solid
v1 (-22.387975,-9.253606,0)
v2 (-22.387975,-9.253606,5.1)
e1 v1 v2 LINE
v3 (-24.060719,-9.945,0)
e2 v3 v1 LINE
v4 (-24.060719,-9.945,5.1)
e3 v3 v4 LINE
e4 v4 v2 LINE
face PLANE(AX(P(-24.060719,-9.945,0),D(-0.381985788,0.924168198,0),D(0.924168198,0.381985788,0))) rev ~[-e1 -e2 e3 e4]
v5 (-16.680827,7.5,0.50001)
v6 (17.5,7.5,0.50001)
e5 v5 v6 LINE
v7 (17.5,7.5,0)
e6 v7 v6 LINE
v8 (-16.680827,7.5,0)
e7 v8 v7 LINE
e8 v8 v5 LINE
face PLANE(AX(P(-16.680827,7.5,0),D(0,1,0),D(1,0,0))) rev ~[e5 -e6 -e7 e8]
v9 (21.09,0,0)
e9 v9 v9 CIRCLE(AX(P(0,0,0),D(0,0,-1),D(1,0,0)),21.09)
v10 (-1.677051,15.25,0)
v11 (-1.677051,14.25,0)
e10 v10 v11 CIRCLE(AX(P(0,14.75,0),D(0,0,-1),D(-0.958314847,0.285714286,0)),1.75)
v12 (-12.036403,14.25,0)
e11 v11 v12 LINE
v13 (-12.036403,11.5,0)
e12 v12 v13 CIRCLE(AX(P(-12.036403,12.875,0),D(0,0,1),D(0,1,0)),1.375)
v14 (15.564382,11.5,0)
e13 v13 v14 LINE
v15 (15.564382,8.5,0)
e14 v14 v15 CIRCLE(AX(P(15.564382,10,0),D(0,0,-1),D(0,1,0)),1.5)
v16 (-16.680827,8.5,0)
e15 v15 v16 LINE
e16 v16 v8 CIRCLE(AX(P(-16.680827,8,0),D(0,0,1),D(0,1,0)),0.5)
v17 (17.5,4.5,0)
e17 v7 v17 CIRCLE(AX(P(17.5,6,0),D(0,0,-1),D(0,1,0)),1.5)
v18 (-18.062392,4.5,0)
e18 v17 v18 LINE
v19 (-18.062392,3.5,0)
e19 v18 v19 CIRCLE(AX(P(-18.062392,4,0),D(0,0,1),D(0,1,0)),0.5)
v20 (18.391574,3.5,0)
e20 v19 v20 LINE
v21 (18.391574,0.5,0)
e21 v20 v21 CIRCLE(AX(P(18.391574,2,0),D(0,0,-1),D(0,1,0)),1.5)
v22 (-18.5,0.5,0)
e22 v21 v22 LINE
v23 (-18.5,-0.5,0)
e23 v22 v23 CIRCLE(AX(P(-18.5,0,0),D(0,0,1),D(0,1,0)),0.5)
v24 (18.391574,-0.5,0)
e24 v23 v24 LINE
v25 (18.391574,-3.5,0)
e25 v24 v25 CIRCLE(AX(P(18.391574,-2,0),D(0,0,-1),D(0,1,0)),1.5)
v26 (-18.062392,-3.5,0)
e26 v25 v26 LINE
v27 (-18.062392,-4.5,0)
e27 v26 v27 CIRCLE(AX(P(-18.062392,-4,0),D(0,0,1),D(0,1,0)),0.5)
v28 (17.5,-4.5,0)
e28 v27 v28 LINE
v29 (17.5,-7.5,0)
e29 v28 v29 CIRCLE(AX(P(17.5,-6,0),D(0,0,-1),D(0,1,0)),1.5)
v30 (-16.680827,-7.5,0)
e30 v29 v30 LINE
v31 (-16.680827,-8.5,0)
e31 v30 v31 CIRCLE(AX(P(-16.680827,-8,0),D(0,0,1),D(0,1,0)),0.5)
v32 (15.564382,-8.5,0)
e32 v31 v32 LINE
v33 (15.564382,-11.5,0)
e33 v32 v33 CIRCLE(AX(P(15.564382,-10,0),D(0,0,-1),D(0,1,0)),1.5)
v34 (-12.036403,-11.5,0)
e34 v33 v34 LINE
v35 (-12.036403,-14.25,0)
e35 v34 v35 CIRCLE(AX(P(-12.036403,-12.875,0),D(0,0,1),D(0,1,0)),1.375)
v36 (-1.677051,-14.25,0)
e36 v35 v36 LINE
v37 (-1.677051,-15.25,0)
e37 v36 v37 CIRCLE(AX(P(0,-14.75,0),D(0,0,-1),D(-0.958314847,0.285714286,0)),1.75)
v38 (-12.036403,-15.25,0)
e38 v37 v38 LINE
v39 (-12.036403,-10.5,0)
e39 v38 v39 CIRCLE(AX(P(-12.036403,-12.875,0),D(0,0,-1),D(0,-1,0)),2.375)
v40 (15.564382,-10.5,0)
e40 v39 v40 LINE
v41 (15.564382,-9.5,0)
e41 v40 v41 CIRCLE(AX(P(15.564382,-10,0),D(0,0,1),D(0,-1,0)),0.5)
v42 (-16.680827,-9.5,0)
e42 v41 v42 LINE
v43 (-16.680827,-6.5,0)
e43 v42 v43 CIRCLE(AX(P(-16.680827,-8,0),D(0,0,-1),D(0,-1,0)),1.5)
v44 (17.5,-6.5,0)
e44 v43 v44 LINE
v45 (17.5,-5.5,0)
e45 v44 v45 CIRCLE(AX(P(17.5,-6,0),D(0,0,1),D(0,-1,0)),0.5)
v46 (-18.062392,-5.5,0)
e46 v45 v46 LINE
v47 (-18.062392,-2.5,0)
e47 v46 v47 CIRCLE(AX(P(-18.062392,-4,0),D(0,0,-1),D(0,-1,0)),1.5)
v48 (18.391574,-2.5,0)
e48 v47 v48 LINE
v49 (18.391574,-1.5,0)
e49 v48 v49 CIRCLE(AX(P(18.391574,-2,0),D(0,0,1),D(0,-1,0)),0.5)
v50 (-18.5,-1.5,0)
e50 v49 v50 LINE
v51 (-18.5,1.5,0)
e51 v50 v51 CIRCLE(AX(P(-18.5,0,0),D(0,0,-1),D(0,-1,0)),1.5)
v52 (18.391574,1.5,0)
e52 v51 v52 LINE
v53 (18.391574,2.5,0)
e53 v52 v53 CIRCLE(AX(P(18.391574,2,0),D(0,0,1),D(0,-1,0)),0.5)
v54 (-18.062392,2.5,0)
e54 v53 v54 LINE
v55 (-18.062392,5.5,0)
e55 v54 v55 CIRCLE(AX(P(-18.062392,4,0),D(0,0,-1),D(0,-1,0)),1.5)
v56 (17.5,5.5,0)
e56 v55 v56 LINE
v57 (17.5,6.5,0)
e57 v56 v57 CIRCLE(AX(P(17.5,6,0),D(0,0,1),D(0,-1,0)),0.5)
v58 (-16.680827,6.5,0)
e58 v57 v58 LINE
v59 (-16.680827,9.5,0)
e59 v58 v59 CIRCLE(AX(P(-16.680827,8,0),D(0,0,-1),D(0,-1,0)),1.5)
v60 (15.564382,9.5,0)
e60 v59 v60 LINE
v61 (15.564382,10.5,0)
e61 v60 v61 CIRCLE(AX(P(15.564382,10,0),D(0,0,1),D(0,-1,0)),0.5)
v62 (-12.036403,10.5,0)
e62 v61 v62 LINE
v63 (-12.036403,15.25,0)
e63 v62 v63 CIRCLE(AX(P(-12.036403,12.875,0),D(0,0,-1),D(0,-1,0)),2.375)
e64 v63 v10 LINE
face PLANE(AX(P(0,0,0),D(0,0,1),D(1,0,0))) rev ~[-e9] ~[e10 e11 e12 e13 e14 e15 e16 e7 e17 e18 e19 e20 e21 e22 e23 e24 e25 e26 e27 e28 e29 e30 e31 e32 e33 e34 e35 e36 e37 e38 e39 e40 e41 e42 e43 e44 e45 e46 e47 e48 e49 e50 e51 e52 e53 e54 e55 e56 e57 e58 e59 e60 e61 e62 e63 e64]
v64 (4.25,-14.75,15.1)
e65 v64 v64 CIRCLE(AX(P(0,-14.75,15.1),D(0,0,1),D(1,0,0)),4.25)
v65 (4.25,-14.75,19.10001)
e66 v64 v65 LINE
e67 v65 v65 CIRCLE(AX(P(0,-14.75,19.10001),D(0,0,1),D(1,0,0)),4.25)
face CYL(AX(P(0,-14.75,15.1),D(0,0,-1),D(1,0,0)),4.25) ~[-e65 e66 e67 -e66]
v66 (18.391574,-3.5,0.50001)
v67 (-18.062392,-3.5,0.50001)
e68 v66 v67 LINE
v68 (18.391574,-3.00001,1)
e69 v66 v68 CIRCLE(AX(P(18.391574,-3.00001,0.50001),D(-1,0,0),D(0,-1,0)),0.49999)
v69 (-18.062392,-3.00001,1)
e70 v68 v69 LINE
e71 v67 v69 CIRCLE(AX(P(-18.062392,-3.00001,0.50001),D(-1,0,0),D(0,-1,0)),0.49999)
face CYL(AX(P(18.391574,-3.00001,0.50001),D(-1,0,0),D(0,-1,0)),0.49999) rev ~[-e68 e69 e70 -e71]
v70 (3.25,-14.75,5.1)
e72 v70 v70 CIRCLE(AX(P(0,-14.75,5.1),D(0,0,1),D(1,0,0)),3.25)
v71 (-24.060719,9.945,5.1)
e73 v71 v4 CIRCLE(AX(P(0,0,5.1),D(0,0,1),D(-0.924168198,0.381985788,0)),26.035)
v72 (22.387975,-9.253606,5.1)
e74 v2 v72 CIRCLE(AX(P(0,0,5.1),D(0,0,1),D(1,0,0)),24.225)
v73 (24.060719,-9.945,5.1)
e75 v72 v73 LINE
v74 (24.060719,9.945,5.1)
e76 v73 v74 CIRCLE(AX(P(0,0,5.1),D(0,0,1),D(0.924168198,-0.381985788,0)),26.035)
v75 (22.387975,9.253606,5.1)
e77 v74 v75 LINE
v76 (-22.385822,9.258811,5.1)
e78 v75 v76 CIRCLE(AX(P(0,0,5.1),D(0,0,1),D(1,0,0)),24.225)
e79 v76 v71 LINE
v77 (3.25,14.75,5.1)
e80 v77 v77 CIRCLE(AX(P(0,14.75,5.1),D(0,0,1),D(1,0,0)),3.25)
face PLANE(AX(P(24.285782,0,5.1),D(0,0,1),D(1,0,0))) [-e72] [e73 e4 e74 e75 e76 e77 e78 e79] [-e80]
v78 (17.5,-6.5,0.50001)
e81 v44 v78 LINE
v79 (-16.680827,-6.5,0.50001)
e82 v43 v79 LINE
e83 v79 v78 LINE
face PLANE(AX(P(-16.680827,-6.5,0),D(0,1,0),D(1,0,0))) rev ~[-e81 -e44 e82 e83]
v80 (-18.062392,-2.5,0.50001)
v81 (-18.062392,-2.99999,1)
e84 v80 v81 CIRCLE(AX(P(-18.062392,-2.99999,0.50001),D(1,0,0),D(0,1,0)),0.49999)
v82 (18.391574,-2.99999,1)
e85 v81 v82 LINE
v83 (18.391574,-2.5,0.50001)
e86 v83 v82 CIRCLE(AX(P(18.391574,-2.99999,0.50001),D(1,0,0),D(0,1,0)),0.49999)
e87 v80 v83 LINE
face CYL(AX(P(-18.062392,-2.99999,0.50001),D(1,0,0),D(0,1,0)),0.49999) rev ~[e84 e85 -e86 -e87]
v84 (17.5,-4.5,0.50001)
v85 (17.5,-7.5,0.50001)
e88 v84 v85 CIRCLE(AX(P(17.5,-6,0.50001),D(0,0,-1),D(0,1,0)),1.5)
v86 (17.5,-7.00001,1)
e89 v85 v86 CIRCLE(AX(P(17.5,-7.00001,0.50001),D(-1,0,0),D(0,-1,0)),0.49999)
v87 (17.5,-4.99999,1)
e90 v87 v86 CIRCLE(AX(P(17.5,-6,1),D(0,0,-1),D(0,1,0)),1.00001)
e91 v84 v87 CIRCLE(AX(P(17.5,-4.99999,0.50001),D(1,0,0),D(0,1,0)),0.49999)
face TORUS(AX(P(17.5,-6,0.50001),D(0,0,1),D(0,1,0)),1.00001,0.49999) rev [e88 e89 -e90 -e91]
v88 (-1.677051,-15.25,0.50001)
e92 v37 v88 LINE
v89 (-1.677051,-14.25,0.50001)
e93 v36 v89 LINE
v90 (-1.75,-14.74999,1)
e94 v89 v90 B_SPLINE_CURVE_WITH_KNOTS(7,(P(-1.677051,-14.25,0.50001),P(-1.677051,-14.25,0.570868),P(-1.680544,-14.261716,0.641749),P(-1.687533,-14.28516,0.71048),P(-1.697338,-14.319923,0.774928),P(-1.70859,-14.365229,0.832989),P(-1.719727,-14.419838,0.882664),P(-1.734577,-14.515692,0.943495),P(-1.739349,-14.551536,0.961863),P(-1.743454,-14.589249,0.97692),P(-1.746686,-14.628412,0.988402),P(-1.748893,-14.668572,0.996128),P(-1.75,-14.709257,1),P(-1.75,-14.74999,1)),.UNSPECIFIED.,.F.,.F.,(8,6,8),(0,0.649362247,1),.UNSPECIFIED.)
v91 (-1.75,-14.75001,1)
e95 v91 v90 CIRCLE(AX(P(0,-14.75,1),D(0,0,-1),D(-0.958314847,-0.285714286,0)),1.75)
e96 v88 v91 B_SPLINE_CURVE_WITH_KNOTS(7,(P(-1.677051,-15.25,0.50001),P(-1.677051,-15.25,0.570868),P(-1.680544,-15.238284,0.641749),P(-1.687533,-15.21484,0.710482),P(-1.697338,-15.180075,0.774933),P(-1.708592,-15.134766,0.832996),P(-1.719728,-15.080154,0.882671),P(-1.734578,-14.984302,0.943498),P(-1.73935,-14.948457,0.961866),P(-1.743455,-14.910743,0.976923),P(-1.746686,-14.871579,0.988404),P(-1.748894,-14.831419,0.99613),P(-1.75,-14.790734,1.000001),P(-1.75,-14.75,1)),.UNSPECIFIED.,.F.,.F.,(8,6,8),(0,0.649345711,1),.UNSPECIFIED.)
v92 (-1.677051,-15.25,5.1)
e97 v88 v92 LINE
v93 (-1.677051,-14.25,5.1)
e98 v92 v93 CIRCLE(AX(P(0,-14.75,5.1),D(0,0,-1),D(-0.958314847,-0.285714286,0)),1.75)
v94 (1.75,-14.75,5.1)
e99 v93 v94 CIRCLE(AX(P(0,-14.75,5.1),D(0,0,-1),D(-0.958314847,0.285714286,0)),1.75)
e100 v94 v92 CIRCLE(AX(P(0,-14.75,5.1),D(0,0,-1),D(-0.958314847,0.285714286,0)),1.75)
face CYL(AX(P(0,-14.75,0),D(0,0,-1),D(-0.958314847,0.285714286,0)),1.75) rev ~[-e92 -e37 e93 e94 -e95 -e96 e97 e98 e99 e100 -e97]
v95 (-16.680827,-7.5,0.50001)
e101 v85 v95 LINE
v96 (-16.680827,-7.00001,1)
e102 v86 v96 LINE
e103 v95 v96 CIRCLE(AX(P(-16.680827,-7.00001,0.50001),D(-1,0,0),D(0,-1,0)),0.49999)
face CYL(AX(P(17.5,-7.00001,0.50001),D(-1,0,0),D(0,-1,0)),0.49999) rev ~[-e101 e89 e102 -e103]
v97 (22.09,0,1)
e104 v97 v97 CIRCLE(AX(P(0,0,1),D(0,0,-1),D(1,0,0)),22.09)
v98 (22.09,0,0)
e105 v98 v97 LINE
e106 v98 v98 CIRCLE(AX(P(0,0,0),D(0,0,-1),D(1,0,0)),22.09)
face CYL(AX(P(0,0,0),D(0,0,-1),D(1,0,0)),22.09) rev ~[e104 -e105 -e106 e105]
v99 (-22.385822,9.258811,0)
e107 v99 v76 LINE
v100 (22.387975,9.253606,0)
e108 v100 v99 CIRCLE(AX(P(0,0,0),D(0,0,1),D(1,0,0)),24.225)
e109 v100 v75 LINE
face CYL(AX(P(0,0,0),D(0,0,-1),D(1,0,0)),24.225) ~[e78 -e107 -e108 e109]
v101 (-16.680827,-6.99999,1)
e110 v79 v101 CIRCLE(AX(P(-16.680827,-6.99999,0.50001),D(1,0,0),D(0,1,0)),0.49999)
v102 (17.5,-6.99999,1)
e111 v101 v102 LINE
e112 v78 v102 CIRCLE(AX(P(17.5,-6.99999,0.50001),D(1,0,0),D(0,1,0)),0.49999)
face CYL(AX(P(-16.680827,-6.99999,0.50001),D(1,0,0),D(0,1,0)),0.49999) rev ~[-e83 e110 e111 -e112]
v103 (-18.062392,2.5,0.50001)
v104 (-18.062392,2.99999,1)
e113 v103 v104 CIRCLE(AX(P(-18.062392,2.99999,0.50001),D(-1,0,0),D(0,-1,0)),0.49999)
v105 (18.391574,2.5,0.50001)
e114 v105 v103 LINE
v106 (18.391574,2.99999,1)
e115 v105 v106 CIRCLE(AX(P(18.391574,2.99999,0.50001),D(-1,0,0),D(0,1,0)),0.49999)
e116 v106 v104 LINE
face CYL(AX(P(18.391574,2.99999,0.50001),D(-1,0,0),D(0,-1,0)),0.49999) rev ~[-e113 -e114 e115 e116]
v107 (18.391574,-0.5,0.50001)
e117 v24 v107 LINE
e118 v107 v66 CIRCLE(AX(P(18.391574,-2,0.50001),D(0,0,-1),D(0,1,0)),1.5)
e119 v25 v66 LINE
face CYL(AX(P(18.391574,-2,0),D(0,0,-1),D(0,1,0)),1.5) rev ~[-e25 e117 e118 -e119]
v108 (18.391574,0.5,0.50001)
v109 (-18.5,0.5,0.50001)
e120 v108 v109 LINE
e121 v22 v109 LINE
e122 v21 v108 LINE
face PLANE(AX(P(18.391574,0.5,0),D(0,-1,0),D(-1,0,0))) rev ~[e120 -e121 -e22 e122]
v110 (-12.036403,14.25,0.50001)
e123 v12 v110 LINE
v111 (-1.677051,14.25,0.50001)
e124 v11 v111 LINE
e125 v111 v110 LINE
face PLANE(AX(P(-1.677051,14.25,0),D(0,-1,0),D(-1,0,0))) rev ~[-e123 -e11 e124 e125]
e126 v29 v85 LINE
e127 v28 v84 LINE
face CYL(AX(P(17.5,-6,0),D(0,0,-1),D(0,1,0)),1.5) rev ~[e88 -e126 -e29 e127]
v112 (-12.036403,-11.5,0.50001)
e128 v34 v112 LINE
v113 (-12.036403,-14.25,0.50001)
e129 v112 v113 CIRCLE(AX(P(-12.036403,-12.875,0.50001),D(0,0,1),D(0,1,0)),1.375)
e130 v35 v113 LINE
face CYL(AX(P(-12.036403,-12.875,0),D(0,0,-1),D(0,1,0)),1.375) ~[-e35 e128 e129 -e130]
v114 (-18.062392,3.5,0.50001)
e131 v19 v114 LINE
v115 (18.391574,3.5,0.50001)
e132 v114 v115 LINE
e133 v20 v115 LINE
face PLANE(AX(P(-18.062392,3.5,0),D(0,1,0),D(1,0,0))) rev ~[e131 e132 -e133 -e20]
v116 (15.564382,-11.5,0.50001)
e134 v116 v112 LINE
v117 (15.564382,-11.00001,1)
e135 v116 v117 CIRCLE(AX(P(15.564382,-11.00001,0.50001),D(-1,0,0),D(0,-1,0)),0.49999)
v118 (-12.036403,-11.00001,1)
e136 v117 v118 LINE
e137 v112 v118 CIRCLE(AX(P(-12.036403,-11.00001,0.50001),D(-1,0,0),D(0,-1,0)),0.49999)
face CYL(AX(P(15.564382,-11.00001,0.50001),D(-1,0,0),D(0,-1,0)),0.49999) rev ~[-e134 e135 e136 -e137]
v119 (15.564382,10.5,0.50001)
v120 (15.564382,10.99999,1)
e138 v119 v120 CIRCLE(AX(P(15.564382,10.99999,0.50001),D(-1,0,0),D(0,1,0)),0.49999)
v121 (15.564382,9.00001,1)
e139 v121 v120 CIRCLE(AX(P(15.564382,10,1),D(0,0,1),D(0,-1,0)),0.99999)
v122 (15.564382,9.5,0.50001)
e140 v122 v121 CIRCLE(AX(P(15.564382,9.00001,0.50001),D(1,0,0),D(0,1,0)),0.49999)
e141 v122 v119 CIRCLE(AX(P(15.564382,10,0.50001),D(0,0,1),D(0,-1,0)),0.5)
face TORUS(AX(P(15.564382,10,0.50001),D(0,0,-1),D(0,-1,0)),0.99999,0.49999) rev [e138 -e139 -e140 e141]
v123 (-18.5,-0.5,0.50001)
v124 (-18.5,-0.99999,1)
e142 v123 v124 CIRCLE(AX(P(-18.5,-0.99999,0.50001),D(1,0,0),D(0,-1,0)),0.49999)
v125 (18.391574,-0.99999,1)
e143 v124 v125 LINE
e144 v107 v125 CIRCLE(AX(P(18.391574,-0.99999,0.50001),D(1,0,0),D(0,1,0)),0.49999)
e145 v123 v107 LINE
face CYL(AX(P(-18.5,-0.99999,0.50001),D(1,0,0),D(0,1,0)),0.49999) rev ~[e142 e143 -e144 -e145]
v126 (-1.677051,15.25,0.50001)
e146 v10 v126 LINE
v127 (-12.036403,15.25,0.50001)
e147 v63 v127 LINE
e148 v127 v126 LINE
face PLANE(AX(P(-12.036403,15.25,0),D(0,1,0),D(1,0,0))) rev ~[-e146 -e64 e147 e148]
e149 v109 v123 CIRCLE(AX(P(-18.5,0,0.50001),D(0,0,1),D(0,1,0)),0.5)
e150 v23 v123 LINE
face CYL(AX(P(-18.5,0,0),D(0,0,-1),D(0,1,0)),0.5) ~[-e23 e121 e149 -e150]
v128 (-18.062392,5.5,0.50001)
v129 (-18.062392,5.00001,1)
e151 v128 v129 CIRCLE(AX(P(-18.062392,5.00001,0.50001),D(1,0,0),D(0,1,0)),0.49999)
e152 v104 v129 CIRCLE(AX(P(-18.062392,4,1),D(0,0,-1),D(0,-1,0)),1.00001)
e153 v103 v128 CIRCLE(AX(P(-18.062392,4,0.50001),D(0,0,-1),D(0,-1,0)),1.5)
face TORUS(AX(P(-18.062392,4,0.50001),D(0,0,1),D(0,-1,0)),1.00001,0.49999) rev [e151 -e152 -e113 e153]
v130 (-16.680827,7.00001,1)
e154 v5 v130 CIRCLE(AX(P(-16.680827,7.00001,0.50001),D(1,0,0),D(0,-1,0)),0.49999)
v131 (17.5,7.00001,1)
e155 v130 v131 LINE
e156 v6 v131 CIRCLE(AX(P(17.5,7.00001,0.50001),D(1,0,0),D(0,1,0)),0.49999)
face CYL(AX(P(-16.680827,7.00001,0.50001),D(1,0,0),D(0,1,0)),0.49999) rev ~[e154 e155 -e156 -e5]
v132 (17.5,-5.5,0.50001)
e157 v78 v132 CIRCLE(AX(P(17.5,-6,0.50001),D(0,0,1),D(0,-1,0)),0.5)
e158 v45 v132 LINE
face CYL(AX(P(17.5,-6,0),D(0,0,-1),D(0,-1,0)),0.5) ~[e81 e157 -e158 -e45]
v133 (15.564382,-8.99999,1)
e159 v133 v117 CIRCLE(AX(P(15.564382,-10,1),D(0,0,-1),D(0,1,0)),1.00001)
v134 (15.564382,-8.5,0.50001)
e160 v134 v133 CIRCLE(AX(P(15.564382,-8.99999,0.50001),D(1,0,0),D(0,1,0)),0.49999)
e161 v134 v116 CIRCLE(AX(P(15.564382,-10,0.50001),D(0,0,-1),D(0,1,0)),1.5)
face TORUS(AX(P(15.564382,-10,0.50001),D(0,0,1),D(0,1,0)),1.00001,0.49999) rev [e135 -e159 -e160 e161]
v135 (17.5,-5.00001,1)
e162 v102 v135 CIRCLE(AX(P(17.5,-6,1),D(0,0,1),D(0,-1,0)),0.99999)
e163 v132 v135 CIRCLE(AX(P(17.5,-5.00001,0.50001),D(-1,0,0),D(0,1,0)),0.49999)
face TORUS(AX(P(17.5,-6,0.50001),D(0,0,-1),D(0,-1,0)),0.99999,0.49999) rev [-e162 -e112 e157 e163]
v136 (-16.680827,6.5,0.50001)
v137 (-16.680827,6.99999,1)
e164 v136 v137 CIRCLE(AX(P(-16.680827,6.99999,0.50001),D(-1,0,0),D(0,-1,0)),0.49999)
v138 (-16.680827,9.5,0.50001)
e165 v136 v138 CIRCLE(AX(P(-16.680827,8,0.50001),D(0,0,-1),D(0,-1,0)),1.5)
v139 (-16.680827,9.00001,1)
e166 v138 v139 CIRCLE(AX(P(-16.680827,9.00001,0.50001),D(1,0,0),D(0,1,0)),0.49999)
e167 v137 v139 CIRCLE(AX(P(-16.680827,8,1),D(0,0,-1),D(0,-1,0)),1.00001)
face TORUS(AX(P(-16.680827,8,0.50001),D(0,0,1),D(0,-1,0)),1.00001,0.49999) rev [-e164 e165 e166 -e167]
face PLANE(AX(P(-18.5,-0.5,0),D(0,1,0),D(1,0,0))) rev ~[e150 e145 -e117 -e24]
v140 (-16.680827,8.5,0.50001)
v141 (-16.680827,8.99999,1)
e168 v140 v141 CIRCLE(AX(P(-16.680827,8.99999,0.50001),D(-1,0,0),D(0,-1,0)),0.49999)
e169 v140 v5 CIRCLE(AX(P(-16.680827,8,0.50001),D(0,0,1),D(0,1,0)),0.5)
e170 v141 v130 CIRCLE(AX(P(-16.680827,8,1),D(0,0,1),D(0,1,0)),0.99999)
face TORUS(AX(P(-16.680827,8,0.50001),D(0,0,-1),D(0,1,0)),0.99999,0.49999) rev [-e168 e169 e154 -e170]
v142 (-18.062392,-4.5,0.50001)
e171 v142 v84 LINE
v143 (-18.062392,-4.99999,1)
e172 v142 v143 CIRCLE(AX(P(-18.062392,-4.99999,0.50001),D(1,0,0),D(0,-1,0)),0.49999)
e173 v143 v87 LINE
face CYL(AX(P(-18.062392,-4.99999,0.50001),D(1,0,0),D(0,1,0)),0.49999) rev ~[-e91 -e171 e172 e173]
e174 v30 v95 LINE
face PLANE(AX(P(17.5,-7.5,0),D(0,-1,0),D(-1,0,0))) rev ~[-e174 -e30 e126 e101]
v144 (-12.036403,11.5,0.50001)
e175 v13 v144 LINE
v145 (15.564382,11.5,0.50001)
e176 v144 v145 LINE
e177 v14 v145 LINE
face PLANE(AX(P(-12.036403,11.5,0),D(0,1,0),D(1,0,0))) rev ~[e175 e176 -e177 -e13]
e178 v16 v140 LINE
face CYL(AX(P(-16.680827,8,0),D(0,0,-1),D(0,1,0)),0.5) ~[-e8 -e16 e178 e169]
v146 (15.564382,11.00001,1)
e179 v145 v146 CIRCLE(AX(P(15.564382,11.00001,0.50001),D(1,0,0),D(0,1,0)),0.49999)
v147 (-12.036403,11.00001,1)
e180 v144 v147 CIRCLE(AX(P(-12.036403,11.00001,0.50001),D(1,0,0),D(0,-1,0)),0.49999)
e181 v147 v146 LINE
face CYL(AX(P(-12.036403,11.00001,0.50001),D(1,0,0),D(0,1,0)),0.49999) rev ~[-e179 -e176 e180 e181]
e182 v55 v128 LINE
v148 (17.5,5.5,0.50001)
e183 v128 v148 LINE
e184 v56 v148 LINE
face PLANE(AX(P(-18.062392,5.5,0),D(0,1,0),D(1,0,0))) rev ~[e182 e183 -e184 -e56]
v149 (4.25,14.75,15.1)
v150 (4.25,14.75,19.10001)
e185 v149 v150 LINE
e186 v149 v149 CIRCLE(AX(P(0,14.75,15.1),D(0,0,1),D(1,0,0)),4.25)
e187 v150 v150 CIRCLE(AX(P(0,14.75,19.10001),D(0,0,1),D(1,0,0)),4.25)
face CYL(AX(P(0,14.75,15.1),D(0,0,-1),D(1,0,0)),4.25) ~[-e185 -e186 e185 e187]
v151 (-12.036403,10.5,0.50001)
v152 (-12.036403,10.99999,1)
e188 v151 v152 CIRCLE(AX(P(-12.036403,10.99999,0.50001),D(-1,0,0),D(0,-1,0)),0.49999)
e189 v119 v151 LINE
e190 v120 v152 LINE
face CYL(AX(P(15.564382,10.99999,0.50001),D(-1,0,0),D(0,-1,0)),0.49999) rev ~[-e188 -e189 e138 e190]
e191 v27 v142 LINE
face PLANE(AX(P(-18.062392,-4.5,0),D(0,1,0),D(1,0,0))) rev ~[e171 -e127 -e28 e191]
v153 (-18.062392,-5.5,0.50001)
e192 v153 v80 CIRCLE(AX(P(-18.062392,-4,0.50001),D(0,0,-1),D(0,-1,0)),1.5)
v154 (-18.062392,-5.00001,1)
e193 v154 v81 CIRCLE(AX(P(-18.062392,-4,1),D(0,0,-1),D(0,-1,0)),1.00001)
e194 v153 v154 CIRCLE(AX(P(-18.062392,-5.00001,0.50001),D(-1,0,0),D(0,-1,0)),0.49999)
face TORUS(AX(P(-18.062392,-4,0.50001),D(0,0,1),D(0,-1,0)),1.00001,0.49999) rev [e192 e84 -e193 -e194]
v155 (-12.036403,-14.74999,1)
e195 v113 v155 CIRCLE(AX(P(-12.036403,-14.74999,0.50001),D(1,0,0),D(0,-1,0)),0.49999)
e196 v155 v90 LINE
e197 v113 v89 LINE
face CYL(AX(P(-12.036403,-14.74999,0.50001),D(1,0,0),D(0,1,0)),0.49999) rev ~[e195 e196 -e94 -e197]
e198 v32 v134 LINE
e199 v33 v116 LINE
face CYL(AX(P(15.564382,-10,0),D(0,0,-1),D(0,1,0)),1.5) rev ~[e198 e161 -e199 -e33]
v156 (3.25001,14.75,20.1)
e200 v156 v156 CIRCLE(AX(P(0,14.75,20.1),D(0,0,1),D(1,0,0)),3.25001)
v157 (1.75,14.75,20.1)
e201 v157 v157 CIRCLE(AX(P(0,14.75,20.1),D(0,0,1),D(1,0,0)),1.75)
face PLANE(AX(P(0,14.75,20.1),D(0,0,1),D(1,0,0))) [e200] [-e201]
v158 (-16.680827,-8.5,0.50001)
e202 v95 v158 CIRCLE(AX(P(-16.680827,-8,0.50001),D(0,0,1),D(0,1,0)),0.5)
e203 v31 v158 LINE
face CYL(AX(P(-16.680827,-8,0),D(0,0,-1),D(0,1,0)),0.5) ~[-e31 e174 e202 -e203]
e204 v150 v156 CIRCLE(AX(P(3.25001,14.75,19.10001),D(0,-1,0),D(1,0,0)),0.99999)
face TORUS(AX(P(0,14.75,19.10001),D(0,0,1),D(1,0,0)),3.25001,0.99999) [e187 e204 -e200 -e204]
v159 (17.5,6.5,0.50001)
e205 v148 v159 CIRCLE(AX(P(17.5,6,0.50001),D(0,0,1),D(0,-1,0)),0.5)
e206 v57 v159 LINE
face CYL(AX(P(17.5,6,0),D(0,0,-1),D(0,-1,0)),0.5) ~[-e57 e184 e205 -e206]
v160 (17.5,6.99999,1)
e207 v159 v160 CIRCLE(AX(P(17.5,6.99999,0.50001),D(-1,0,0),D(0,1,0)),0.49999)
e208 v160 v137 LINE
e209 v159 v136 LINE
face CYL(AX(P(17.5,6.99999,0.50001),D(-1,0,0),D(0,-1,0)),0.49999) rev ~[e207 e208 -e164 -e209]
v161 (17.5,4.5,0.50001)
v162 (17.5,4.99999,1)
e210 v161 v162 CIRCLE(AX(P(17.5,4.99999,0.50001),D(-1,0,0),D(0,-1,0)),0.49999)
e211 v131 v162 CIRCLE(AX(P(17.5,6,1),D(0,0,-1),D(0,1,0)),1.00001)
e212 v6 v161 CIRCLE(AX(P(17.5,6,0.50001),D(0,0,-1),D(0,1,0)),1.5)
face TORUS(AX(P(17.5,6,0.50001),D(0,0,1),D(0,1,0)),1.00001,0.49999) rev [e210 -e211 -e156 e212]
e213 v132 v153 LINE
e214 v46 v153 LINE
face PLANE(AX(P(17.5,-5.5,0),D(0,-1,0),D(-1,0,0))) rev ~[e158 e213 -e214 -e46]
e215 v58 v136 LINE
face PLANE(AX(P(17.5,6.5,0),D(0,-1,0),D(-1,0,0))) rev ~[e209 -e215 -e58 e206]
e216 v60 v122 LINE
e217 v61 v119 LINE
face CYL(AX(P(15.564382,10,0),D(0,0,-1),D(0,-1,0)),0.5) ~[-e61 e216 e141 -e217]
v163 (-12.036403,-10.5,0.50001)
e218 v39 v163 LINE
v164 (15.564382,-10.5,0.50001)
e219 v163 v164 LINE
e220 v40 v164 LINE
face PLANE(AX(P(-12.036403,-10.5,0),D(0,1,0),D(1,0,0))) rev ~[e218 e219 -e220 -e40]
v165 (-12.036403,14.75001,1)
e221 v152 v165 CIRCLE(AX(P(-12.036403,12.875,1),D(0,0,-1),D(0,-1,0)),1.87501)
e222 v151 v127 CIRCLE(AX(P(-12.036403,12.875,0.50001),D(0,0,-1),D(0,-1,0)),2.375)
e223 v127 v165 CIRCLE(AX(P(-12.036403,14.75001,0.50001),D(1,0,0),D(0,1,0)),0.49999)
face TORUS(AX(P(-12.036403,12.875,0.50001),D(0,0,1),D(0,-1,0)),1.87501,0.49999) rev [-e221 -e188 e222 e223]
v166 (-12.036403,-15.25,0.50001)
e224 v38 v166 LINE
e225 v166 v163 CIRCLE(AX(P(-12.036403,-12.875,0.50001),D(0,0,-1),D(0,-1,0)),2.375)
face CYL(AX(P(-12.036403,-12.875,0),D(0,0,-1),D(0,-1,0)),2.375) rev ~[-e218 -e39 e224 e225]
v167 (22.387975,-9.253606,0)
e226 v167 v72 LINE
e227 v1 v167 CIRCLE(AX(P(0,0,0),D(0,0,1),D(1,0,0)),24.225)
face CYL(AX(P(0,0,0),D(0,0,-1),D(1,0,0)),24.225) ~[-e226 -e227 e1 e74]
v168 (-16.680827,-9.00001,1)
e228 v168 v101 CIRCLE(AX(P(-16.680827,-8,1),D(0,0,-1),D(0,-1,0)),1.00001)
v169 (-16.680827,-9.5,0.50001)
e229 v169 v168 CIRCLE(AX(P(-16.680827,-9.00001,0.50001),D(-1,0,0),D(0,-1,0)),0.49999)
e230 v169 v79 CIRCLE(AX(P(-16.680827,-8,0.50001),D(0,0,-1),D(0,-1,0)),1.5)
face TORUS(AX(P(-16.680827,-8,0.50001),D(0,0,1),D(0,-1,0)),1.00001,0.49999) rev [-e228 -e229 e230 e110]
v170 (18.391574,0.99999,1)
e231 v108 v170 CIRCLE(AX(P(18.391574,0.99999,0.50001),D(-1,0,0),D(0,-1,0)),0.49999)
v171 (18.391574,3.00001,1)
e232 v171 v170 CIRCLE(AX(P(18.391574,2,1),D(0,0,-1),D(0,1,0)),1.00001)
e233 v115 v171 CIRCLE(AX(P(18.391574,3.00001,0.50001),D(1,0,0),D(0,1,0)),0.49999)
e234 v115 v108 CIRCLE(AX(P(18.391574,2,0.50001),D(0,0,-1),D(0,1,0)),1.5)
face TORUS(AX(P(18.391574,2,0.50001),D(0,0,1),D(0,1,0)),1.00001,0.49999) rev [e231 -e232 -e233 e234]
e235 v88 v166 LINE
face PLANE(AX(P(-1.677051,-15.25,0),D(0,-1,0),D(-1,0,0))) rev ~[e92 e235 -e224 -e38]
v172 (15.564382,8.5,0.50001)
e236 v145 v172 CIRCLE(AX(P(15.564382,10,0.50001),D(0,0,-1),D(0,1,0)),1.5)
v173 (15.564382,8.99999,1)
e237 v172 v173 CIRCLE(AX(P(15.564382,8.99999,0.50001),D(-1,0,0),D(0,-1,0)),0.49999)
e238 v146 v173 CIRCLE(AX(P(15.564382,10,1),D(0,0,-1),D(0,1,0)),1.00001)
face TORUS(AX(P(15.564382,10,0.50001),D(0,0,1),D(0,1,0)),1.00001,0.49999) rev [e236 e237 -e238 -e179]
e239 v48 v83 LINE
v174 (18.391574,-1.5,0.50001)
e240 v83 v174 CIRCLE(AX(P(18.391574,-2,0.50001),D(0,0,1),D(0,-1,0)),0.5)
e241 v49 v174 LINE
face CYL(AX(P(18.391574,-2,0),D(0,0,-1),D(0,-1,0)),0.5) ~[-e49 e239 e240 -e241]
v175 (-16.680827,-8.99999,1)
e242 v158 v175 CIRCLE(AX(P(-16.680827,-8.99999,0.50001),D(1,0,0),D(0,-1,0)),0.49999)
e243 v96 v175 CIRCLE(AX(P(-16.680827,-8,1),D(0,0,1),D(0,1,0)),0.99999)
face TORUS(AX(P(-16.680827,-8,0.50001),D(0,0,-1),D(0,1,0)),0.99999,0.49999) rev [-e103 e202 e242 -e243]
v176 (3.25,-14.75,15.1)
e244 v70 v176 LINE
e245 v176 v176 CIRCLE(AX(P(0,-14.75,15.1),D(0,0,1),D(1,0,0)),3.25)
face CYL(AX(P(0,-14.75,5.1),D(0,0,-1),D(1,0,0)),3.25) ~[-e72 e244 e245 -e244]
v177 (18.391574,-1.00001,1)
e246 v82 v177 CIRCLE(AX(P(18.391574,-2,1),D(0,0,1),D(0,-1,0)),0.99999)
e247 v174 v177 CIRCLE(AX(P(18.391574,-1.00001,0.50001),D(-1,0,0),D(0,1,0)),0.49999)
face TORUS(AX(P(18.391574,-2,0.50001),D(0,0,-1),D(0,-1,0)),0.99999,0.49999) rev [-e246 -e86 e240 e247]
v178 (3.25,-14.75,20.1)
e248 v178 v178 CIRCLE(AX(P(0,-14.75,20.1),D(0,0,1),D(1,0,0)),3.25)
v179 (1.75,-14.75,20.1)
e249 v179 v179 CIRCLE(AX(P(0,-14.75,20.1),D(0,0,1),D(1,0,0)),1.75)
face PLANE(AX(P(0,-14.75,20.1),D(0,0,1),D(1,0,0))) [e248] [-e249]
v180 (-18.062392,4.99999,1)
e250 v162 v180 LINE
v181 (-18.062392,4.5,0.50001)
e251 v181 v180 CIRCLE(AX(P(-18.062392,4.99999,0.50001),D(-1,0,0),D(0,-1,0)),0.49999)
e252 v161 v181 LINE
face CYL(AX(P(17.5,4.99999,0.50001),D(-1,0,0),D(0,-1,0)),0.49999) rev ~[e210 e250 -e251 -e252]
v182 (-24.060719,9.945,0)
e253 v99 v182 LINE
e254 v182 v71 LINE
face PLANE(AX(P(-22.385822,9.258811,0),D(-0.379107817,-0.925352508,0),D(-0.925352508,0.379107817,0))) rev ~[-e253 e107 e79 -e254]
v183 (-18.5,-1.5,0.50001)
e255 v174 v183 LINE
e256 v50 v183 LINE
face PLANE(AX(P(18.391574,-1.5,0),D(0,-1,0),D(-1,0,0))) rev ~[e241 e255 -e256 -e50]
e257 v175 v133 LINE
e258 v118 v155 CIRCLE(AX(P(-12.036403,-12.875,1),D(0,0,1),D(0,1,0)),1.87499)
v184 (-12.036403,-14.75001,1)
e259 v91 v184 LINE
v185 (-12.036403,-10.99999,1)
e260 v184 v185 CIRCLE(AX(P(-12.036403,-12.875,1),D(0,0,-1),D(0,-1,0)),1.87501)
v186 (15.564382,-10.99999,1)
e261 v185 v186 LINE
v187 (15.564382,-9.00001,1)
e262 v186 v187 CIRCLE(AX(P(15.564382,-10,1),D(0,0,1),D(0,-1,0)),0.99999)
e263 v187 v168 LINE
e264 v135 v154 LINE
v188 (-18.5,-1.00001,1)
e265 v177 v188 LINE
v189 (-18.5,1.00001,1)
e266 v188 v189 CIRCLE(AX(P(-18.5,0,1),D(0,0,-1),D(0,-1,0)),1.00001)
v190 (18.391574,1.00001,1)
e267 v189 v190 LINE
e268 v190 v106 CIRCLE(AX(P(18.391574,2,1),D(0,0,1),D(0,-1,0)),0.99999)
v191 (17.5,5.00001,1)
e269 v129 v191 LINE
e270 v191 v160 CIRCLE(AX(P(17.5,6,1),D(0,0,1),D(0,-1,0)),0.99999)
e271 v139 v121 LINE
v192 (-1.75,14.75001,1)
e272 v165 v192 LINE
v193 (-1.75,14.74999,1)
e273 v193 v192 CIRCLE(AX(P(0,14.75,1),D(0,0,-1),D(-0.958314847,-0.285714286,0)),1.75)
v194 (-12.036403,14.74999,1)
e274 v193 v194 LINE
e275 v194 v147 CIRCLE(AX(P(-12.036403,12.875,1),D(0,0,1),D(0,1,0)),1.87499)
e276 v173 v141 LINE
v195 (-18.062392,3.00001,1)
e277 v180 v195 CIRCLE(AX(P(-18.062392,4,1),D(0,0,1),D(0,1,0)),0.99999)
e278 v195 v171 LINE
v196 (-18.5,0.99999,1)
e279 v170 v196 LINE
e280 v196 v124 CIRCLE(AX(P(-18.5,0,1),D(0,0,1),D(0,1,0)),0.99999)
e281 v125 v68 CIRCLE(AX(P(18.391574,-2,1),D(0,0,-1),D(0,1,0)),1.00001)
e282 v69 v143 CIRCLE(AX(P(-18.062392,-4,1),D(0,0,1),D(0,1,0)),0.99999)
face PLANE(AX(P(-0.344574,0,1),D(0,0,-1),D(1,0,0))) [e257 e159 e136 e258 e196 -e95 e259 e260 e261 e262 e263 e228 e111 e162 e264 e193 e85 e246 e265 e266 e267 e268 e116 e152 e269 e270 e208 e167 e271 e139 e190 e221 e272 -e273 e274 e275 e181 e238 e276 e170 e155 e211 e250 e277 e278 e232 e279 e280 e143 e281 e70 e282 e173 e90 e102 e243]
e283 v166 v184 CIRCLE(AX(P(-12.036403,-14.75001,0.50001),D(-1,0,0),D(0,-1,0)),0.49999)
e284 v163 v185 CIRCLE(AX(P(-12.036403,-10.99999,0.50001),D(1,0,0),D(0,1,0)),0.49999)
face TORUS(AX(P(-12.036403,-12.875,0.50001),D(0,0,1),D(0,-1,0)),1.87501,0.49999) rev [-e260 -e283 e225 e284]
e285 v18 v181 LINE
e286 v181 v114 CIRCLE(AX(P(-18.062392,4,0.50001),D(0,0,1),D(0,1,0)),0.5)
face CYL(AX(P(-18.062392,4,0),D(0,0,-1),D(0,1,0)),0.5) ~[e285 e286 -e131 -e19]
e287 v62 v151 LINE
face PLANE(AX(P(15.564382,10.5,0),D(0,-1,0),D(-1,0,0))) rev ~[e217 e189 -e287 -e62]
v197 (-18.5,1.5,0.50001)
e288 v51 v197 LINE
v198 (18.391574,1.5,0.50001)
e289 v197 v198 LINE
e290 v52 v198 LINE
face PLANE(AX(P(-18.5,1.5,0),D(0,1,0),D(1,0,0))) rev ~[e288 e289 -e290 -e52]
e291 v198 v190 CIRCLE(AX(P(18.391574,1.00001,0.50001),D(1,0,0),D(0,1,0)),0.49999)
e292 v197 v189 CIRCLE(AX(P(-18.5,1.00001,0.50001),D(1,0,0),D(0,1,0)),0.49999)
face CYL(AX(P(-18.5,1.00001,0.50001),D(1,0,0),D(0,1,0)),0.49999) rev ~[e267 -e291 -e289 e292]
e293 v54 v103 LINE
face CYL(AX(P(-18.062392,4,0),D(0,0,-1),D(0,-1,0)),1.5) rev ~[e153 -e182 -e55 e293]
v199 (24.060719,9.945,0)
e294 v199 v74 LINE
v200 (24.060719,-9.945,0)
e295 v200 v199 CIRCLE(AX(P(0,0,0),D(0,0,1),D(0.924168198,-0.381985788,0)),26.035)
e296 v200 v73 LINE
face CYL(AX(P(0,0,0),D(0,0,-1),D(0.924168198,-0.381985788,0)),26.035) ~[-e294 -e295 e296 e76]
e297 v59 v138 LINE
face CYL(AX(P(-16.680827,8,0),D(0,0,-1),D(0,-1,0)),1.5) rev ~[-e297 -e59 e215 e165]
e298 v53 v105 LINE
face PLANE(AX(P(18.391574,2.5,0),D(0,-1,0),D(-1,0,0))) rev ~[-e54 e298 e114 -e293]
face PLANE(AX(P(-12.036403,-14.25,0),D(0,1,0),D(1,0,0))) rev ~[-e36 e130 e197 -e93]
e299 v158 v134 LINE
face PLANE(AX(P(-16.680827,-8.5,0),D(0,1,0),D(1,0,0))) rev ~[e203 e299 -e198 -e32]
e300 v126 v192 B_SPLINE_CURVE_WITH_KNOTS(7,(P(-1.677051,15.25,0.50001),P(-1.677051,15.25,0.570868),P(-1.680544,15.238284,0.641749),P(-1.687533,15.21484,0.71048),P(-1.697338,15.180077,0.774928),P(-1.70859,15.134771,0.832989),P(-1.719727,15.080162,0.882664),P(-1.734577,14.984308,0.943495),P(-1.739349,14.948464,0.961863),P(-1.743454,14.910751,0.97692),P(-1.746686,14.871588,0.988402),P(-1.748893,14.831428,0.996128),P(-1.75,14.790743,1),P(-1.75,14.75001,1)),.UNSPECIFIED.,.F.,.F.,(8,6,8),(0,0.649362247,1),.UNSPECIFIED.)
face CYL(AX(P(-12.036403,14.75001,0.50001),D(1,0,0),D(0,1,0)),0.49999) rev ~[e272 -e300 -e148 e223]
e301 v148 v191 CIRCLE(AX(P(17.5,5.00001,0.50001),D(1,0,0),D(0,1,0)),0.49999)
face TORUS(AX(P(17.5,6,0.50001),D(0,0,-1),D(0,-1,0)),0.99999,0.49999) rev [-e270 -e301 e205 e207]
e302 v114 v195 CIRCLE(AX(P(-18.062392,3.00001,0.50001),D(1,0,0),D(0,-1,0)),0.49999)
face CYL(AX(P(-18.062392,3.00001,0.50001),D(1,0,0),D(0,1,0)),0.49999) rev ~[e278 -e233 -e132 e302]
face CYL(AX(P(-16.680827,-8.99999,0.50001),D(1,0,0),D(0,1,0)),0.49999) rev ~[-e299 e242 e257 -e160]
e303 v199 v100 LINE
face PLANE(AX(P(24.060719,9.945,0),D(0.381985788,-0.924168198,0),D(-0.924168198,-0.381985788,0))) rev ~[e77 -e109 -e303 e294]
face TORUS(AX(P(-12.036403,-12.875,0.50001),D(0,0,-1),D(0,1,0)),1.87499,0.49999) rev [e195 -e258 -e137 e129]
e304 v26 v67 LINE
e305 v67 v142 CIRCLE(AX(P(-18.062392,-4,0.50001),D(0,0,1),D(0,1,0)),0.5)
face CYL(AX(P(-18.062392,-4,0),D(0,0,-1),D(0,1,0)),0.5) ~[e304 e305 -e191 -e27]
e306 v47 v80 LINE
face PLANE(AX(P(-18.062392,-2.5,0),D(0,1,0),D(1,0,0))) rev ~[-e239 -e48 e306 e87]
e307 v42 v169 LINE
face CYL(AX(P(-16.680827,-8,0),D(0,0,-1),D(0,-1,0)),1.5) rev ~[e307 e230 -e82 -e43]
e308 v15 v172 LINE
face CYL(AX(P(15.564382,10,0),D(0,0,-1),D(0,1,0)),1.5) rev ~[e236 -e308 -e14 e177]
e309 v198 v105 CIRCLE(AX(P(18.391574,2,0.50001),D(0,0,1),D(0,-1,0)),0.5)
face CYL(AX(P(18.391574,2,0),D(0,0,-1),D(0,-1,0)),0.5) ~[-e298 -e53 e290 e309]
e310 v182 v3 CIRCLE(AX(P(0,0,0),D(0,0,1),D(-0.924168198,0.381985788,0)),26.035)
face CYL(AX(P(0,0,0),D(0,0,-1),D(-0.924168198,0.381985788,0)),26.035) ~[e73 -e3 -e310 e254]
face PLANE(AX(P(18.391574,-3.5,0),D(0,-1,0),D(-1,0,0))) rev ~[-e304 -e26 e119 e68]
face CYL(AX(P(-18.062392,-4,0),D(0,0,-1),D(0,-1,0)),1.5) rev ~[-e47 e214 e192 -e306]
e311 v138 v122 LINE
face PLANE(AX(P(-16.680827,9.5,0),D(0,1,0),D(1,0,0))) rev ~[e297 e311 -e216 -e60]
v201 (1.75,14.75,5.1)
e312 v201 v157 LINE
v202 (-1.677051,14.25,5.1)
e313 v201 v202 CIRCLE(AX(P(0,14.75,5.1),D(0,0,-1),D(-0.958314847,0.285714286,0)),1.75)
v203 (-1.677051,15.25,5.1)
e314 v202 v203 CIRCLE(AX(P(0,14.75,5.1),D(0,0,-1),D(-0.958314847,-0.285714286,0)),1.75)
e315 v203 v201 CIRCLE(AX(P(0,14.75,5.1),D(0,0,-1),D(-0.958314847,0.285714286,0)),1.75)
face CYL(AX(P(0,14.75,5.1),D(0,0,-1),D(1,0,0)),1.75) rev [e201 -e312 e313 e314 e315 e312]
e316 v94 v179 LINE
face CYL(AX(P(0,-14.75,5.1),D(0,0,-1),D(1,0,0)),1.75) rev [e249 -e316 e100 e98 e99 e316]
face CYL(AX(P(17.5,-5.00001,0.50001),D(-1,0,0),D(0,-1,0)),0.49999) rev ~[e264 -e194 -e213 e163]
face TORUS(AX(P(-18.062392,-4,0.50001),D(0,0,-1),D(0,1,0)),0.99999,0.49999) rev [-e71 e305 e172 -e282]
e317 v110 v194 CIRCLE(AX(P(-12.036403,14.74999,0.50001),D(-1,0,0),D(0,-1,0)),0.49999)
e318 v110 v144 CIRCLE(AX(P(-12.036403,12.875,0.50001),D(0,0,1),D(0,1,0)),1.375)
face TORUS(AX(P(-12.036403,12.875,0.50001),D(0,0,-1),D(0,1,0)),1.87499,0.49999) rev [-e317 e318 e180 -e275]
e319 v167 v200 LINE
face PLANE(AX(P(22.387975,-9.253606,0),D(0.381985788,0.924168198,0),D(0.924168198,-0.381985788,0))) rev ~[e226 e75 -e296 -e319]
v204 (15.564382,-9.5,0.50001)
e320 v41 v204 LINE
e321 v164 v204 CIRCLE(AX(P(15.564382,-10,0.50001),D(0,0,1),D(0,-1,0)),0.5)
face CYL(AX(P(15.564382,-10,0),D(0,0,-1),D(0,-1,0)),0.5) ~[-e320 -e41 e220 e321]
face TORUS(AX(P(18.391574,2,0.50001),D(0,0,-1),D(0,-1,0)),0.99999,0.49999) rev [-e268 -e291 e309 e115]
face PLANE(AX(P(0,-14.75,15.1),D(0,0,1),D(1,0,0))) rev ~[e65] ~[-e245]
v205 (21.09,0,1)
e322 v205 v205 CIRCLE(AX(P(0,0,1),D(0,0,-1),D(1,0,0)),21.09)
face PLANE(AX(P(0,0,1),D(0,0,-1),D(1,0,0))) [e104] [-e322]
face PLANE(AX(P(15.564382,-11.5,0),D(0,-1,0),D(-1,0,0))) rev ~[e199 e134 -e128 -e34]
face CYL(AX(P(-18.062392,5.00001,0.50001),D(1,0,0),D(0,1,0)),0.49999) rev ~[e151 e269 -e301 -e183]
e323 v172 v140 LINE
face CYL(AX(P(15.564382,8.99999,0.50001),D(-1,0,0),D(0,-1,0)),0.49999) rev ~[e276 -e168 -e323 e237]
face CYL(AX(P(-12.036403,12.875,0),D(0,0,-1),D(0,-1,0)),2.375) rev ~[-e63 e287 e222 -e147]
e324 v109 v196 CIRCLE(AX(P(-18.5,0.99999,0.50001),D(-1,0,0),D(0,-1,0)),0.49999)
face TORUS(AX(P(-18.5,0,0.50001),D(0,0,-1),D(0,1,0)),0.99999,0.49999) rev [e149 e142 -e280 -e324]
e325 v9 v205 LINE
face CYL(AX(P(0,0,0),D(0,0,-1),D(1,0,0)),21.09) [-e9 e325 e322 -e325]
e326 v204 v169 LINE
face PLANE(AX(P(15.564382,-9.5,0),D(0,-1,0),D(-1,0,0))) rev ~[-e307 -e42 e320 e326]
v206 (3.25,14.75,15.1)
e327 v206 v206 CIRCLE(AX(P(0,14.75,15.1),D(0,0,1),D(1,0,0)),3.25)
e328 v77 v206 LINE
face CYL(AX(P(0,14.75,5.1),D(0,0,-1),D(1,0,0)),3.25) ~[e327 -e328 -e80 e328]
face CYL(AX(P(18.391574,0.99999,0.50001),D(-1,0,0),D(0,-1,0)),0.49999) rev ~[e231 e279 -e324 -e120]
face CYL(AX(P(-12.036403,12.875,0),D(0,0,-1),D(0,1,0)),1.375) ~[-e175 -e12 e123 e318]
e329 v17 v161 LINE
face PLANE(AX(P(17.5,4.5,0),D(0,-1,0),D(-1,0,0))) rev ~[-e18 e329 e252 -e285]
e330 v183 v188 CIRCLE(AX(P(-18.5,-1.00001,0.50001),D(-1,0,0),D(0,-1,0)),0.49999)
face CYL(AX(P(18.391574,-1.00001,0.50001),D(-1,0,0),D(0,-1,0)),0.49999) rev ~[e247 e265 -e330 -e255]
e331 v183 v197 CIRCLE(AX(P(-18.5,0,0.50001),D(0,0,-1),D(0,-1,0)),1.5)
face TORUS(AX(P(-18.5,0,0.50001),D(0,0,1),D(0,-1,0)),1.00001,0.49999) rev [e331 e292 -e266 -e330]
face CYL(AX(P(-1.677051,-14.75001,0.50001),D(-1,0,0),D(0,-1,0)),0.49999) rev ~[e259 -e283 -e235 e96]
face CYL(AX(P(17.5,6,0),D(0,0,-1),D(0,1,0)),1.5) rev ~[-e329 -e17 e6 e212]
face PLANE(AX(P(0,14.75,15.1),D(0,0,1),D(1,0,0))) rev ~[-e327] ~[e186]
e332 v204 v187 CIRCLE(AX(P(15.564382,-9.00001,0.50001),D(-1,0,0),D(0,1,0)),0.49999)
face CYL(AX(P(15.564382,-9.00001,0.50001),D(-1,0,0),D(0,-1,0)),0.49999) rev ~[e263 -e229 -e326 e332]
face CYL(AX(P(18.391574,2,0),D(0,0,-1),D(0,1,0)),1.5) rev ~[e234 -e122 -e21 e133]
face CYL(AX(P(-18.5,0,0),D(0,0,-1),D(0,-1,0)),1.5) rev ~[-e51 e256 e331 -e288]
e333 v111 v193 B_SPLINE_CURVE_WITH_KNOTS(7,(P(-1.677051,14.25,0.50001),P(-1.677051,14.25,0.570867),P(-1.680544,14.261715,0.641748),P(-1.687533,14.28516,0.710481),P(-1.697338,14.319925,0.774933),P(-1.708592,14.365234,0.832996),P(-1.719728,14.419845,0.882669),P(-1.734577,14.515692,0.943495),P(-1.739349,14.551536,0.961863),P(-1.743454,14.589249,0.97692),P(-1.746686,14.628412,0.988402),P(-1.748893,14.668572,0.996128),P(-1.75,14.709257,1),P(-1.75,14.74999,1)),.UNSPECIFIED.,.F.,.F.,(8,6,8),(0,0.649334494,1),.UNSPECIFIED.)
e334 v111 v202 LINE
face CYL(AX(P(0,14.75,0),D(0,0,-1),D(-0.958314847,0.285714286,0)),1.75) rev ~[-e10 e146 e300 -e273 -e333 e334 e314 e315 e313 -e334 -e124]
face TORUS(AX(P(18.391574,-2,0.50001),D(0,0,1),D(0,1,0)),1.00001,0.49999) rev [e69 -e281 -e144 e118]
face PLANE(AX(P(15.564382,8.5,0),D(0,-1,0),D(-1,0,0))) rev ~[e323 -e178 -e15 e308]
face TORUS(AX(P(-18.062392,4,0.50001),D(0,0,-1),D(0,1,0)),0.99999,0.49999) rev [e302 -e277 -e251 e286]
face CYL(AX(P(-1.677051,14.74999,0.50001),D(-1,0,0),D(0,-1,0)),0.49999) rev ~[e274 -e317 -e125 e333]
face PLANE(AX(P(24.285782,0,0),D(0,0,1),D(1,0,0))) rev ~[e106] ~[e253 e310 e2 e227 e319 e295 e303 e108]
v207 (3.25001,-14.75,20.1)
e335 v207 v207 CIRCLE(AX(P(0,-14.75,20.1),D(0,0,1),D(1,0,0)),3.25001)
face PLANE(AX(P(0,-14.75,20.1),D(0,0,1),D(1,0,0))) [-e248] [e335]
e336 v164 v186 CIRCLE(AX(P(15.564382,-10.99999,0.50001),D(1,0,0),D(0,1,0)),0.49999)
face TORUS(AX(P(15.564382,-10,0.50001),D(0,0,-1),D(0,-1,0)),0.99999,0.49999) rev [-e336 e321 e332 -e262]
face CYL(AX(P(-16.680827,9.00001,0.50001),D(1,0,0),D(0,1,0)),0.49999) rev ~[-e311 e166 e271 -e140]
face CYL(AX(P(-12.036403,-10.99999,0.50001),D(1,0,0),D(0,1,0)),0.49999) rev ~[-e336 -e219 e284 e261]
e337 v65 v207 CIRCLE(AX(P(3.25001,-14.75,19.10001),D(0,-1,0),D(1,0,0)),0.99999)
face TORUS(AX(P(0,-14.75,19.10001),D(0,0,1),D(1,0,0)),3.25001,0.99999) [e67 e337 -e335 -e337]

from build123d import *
from build123d import SkipClean  # not in build123d's __all__

# Parameters (mm, degrees)
F0_R      = 24.225
F1_DEPTH  = 5.1
F2_R      = 22.09
F2_R_2    = 21.09
F3_DEPTH  = 1
F5_DEPTH  = 1
F6_R      = 0.49999
F8_DEPTH  = 5.101
F9_R      = 3.25
F9_R_2    = 1.75
F10_DEPTH = 15
F12_DEPTH = 5.1
F14_R     = 4.25
F14_R_2   = 3.25
F15_DEPTH = 5
F16_R     = 0.99999


# Not quite as in the source:
# - a fillet or chamfer is up to 0.001 mm smaller than in the source, because OpenCascade refuses the exact size
# - after a boolean that leaves OpenCascade's solid faulty, fix() repairs it


with BuildPart() as f1:
    # F0 (on Top) → F1 (new body)
    with BuildSketch(Plane.XY):
        Circle(F0_R)
    extrude(amount=F1_DEPTH)

    # F2 (on face) → F3 (cut)
    with BuildSketch(Plane(origin=(0, 0, 0), x_dir=(1, 0, 0), z_dir=(0, 0, -1))):
        Circle(F2_R)
        Circle(F2_R_2, mode=Mode.SUBTRACT)
    extrude(amount=-F3_DEPTH, mode=Mode.SUBTRACT)

    # F4 (on face) → F5 (cut)
    with BuildSketch(Plane(origin=(0, 0, 0), x_dir=(1, 0, 0), z_dir=(0, 0, -1))):
        with BuildLine():
            Line((-12.0364031172, -15.25), (-1.6770509831, -15.25))
            ThreePointArc((-1.6770509831, -15.25), (1.75, -14.75), (-1.6770509831, -14.25))
            Line((-1.6770509831, -14.25), (-12.0364031172, -14.25))
            ThreePointArc((-12.0364031172, -14.25), (-13.4114031172, -12.875), (-12.0364031172, -11.5))
            Line((-12.0364031172, -11.5), (15.5643824163, -11.5))
            ThreePointArc((15.5643824163, -11.5), (17.0643824163, -10), (15.5643824163, -8.5))
            Line((15.5643824163, -8.5), (-16.6808273176, -8.5))
            ThreePointArc((-16.6808273176, -8.5), (-17.1808273176, -8), (-16.6808273176, -7.5))
            Line((-16.6808273176, -7.5), (17.5, -7.5))
            ThreePointArc((17.5, -7.5), (19, -6), (17.5, -4.5))
            Line((17.5, -4.5), (-18.0623918682, -4.5))
            ThreePointArc((-18.0623918682, -4.5), (-18.5623918682, -4), (-18.0623918682, -3.5))
            Line((-18.0623918682, -3.5), (18.3915741577, -3.5))
            ThreePointArc((18.3915741577, -3.5), (19.8915741577, -2), (18.3915741577, -0.5))
            Line((18.3915741577, -0.5), (-18.5, -0.5))
            ThreePointArc((-18.5, -0.5), (-19, 0), (-18.5, 0.5))
            Line((-18.5, 0.5), (18.3915741577, 0.5))
            ThreePointArc((18.3915741577, 0.5), (19.8915741577, 2), (18.3915741577, 3.5))
            Line((18.3915741577, 3.5), (-18.0623918682, 3.5))
            ThreePointArc((-18.0623918682, 3.5), (-18.5623918682, 4), (-18.0623918682, 4.5))
            Line((-18.0623918682, 4.5), (17.5, 4.5))
            ThreePointArc((17.5, 4.5), (19, 6), (17.5, 7.5))
            Line((17.5, 7.5), (-16.6808273176, 7.5))
            ThreePointArc((-16.6808273176, 7.5), (-17.1808273176, 8), (-16.6808273176, 8.5))
            Line((-16.6808273176, 8.5), (15.5643824163, 8.5))
            ThreePointArc((15.5643824163, 8.5), (17.0643824163, 10), (15.5643824163, 11.5))
            Line((15.5643824163, 11.5), (-12.0364031172, 11.5))
            ThreePointArc((-12.0364031172, 11.5), (-13.4114031172, 12.875), (-12.0364031172, 14.25))
            Line((-12.0364031172, 14.25), (-1.6770509831, 14.25))
            ThreePointArc((-1.6770509831, 14.25), (1.75, 14.75), (-1.6770509831, 15.25))
            Line((-1.6770509831, 15.25), (-12.0364031172, 15.25))
            ThreePointArc((-12.0364031172, 15.25), (-14.4114031172, 12.875), (-12.0364031172, 10.5))
            Line((-12.0364031172, 10.5), (15.5643824163, 10.5))
            ThreePointArc((15.5643824163, 10.5), (16.0643824163, 10), (15.5643824163, 9.5))
            Line((15.5643824163, 9.5), (-16.6808273176, 9.5))
            ThreePointArc((-16.6808273176, 9.5), (-18.1808273176, 8), (-16.6808273176, 6.5))
            Line((-16.6808273176, 6.5), (17.5, 6.5))
            ThreePointArc((17.5, 6.5), (18, 6), (17.5, 5.5))
            Line((17.5, 5.5), (-18.0623918682, 5.5))
            ThreePointArc((-18.0623918682, 5.5), (-19.5623918682, 4), (-18.0623918682, 2.5))
            Line((-18.0623918682, 2.5), (18.3915741577, 2.5))
            ThreePointArc((18.3915741577, 2.5), (18.8915741577, 2), (18.3915741577, 1.5))
            Line((18.3915741577, 1.5), (-18.5, 1.5))
            ThreePointArc((-18.5, 1.5), (-20, 0), (-18.5, -1.5))
            Line((-18.5, -1.5), (18.3915741577, -1.5))
            ThreePointArc((18.3915741577, -1.5), (18.8915741577, -2), (18.3915741577, -2.5))
            Line((18.3915741577, -2.5), (-18.0623918682, -2.5))
            ThreePointArc((-18.0623918682, -2.5), (-19.5623918682, -4), (-18.0623918682, -5.5))
            Line((-18.0623918682, -5.5), (17.5, -5.5))
            ThreePointArc((17.5, -5.5), (18, -6), (17.5, -6.5))
            Line((17.5, -6.5), (-16.6808273176, -6.5))
            ThreePointArc((-16.6808273176, -6.5), (-18.1808273176, -8), (-16.6808273176, -9.5))
            Line((-16.6808273176, -9.5), (15.5643824163, -9.5))
            ThreePointArc((15.5643824163, -9.5), (16.0643824163, -10), (15.5643824163, -10.5))
            Line((15.5643824163, -10.5), (-12.0364031172, -10.5))
            ThreePointArc((-12.0364031172, -10.5), (-14.4114031172, -12.875), (-12.0364031172, -15.25))
        make_face()
    extrude(amount=-F5_DEPTH, mode=Mode.SUBTRACT)

    # F6 (radius 0.5 in the source; OpenCascade refuses exactly that, so slightly less here)
    f6_edges = [f1.edges().sort_by_distance(p)[0] for p in [
        (16.064382, 10, 1),
        (1.76399, 10.5, 1),
        (-14.411403, 12.875, 1),
        (-6.856727, 15.25, 1),
        (1.75, 14.75, 1),
        (-6.856727, 14.25, 1),
        (-13.411403, 12.875, 1),
        (1.76399, 11.5, 1),
        (17.064382, 10, 1),
        (-0.558222, 8.5, 1),
        (-17.180827, 8, 1),
        (0.409586, 7.5, 1),
        (19, 6, 1),
        (-0.281196, 4.5, 1),
        (-18.562392, 4, 1),
        (0.164591, 3.5, 1),
        (19.891574, 2, 1),
        (-0.054213, 0.5, 1),
        (-19, 0, 1),
        (-0.054213, -0.5, 1),
        (19.891574, -2, 1),
        (0.164591, -3.5, 1),
        (-18.562392, -4, 1),
        (-0.281196, -4.5, 1),
        (19, -6, 1),
        (0.409586, -7.5, 1),
        (-17.180827, -8, 1),
        (-0.558222, -8.5, 1),
        (17.064382, -10, 1),
        (1.76399, -11.5, 1),
        (-13.411403, -12.875, 1),
        (-6.856727, -14.25, 1),
        (1.75, -14.75, 1),
        (-6.856727, -15.25, 1),
        (-14.411403, -12.875, 1),
        (1.76399, -10.5, 1),
        (16.064382, -10, 1),
        (-0.558222, -9.5, 1),
        (-18.180827, -8, 1),
        (0.409586, -6.5, 1),
        (18, -6, 1),
        (-0.281196, -5.5, 1),
        (-19.562392, -4, 1),
        (0.164591, -2.5, 1),
        (18.891574, -2, 1),
        (-0.054213, -1.5, 1),
        (-20, 0, 1),
        (-0.054213, 1.5, 1),
        (18.891574, 2, 1),
        (0.164591, 2.5, 1),
        (-19.562392, 4, 1),
        (-0.281196, 5.5, 1),
        (18, 6, 1),
        (0.409586, 6.5, 1),
        (-18.180827, 8, 1),
        (-0.558222, 9.5, 1),
    ]]
    fillet(f6_edges, radius=F6_R)

    # F7 (on face) → F8 (cut, through all)
    with BuildSketch(Plane(origin=(0, 0, 0), x_dir=(1, 0, 0), z_dir=(0, 0, -1))):
        with BuildLine():
            ThreePointArc((-1.6770509831, 14.25), (1.75, 14.75), (-1.6770509831, 15.25))
            ThreePointArc((-1.6770509831, 15.25), (-1.75, 14.75), (-1.6770509831, 14.25))
        make_face()
        with BuildLine():
            ThreePointArc((-1.6770509831, -14.25), (-1.75, -14.75), (-1.6770509831, -15.25))
            ThreePointArc((-1.6770509831, -15.25), (1.75, -14.75), (-1.6770509831, -14.25))
        make_face()
    extrude(amount=-F8_DEPTH, mode=Mode.SUBTRACT)

    # F9 (on face) → F10 (join)
    with BuildSketch(Plane.XY.offset(5.1)):
        with Locations((0, 14.75)):
            Circle(F9_R)
        with Locations((0, 14.75)):
            Circle(F9_R_2, mode=Mode.SUBTRACT)
        with Locations((0, -14.75)):
            Circle(F9_R)
        with Locations((0, -14.75)):
            Circle(F9_R_2, mode=Mode.SUBTRACT)
    with SkipClean():  # cleaning this boolean's faces spoils the solid; the shape is the same uncleaned
        extrude(amount=F10_DEPTH)

    # F11 (on Top) → F12 (join, through all)
    with BuildSketch(Plane.XY):
        with BuildLine():
            Line((-22.3858222692, 9.2588112807), (-24.060719025, 9.945))
            ThreePointArc((-24.060719025, 9.945), (-26.035, 0), (-24.060719025, -9.945))
            Line((-24.060719025, -9.945), (-22.3879745873, -9.2536057231))
            ThreePointArc((-22.3879745873, -9.2536057231), (-24.2249998363, 0.0028164829), (-22.3858222692, 9.2588112807))
        make_face()
        with BuildLine():
            Line((22.3879745873, -9.2536057231), (24.060719025, -9.945))
            ThreePointArc((24.060719025, -9.945), (26.035, 0), (24.060719025, 9.945))
            Line((24.060719025, 9.945), (22.3879745873, 9.2536057231))
            ThreePointArc((22.3879745873, 9.2536057231), (24.225, 0), (22.3879745873, -9.2536057231))
        make_face()
    extrude(amount=F12_DEPTH)

    add(f1.part.fix(), mode=Mode.REPLACE)

    # F14 (on offset) → F15 (join, through all)
    with BuildSketch(Plane.XY.offset(15.1)):
        with Locations((0, 14.75)):
            Circle(F14_R)
        with Locations((0, 14.75)):
            Circle(F14_R_2, mode=Mode.SUBTRACT)
        with Locations((0, -14.75)):
            Circle(F14_R)
        with Locations((0, -14.75)):
            Circle(F14_R_2, mode=Mode.SUBTRACT)
    extrude(amount=F15_DEPTH)

    # F16 (radius 1 in the source; OpenCascade refuses exactly that, so slightly less here)
    f16_edges = [f1.edges().sort_by_distance(p)[0] for p in [
        (-4.25, 14.75, 20.1),
        (-4.25, -14.75, 20.1),
    ]]
    fillet(f16_edges, radius=F16_R)


solid = f1.part
